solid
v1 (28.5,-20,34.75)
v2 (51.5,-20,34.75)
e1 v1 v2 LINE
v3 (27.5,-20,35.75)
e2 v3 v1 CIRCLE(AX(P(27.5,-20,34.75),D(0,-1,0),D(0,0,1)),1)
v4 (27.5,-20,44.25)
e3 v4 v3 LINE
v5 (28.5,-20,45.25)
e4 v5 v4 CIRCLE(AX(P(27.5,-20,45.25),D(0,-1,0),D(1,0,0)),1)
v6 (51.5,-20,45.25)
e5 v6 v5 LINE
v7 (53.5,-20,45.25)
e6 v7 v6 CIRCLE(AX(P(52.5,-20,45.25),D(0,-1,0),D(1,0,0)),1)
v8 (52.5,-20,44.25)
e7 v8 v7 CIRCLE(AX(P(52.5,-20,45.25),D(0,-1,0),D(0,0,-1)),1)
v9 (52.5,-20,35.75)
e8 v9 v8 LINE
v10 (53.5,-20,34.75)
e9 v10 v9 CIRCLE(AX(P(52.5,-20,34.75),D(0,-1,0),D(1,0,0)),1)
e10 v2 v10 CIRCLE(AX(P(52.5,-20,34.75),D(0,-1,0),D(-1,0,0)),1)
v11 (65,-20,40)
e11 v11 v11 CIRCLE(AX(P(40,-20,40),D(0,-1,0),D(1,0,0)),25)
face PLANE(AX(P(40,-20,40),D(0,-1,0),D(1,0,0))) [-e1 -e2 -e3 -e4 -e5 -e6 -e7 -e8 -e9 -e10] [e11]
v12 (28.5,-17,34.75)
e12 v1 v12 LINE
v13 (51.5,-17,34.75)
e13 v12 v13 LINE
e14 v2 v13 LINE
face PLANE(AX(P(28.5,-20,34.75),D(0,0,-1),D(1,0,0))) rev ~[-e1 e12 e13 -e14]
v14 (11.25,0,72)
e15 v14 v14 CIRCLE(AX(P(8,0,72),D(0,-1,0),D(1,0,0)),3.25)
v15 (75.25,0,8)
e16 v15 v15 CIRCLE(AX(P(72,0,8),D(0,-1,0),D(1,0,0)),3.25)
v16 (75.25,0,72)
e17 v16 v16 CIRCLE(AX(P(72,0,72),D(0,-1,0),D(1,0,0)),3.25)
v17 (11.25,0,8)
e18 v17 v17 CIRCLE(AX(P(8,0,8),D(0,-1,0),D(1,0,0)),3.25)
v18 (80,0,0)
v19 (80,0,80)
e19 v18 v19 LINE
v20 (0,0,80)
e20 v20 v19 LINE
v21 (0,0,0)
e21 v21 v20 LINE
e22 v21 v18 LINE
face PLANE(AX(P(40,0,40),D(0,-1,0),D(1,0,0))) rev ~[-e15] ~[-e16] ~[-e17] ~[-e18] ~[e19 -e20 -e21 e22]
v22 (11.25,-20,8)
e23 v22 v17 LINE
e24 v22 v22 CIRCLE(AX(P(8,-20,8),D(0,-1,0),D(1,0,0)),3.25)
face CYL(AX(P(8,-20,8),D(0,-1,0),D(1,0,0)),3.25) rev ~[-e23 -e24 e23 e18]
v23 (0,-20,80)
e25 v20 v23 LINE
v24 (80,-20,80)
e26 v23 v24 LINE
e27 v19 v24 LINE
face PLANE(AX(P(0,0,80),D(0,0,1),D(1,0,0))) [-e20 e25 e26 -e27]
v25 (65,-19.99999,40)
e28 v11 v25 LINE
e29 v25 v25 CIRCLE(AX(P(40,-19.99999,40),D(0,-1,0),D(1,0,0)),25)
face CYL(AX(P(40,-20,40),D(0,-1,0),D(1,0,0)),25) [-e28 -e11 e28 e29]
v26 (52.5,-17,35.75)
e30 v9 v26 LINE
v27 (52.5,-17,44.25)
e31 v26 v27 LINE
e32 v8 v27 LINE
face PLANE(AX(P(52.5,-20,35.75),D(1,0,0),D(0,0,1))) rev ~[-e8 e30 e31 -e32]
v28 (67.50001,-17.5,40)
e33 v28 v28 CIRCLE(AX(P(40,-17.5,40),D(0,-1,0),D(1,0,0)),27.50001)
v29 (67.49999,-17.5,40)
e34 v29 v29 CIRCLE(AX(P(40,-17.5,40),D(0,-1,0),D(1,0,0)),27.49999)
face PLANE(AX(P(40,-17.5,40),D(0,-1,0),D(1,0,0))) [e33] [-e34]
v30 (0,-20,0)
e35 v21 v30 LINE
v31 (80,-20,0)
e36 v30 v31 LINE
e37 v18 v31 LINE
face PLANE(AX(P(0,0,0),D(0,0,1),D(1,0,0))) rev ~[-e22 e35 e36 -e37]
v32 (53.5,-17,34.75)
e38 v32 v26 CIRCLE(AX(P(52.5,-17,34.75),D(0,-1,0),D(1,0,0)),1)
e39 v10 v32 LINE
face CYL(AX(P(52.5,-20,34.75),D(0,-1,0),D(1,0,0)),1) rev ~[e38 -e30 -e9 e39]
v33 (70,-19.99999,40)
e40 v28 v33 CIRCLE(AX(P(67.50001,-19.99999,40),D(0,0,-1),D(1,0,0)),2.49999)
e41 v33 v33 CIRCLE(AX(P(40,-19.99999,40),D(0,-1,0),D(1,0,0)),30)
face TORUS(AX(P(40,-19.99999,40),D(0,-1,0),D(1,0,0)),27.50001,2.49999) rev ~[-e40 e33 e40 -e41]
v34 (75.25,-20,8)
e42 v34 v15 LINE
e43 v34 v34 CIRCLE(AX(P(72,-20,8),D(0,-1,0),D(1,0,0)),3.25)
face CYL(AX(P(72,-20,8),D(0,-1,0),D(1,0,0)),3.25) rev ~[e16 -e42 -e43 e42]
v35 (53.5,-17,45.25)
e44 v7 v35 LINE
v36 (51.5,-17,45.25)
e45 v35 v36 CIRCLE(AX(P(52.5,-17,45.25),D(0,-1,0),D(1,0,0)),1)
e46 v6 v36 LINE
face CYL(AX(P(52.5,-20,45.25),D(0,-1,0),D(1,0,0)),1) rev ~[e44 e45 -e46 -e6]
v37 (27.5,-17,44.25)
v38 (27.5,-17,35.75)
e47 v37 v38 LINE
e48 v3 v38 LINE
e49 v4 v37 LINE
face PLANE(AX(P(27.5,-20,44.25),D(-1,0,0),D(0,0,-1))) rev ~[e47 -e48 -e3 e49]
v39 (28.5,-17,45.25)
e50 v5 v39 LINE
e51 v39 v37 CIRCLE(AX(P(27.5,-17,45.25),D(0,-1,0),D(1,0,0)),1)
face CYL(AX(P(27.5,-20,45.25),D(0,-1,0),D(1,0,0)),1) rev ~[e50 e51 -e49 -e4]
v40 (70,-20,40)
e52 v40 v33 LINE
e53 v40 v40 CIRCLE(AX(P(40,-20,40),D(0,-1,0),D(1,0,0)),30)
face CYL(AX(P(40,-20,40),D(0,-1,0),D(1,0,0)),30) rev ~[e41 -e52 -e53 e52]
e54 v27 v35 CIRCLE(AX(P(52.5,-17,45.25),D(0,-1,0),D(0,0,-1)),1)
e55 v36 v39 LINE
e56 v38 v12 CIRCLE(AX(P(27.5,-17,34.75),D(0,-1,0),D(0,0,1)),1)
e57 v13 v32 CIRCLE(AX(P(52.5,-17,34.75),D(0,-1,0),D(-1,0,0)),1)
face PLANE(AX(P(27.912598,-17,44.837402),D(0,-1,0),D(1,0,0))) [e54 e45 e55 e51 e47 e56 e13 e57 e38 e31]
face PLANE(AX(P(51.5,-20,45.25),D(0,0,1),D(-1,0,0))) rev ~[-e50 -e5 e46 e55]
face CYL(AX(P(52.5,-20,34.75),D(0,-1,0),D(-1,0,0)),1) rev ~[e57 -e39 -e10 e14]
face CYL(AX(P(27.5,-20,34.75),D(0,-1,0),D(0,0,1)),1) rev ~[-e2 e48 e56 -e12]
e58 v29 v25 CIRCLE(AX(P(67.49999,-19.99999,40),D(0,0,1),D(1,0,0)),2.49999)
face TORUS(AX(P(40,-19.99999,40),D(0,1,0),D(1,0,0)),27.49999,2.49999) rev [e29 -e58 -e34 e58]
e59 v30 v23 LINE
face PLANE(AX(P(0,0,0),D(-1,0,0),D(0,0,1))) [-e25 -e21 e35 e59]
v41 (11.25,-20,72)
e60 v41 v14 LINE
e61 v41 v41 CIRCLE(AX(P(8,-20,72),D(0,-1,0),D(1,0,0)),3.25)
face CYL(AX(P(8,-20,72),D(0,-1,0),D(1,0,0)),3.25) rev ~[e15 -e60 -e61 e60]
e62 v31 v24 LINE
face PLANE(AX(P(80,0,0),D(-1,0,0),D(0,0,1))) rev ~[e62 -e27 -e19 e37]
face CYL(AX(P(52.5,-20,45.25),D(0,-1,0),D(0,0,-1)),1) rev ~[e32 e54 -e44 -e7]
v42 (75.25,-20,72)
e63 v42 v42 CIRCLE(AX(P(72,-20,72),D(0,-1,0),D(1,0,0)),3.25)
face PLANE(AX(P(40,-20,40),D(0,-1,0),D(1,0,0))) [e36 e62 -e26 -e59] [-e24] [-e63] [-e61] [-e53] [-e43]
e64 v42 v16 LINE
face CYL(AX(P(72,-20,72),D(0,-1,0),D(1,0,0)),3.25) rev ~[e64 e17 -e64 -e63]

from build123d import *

# Parameters (mm, degrees)
F1_W     = 80
F1_H     = 80
F2_DEPTH = 20
F4_R     = 3.25
F5_DEPTH = 20.001
F4_R_2   = 30
F4_R_3   = 25
F6_DEPTH = 2.5
F7_DEPTH = 3
F8_R     = 2.49999
F9_R     = 2.49999


# Not quite as in the source:
# - a fillet or chamfer is up to 0.001 mm smaller than in the source, because OpenCascade refuses the exact size


with BuildPart() as f2:
    # F1 (on Front) → F2 (new body)
    with BuildSketch(Plane.XZ):
        with Locations((40, 40)):
            Rectangle(F1_W, F1_H)
    extrude(amount=F2_DEPTH)

    # F4 (on face) → F5 (cut, through all)
    with BuildSketch(Plane.XZ.offset(20)):
        with Locations((72, 8)):
            Circle(F4_R)
        with Locations((8, 8)):
            Circle(F4_R)
        with Locations((8, 72)):
            Circle(F4_R)
        with Locations((72, 72)):
            Circle(F4_R)
    extrude(amount=-F5_DEPTH, mode=Mode.SUBTRACT)

    # F4 (on face) → F6 (cut)
    with BuildSketch(Plane.XZ.offset(20)):
        with Locations((40, 40)):
            Circle(F4_R_2)
        with Locations((40, 40)):
            Circle(F4_R_3, mode=Mode.SUBTRACT)
    extrude(amount=-F6_DEPTH, mode=Mode.SUBTRACT)

    # F4 (on face) → F7 (cut)
    with BuildSketch(Plane.XZ.offset(20)):
        with BuildLine():
            Line((28.5, 45.25), (27.5, 45.25))
            Line((27.5, 45.25), (27.5, 44.25))
            ThreePointArc((27.5, 44.25), (28.2071067812, 44.5428932188), (28.5, 45.25))
        make_face()
        with BuildLine():
            Line((51.5, 45.25), (28.5, 45.25))
            ThreePointArc((28.5, 45.25), (28.2071067812, 44.5428932188), (27.5, 44.25))
            Line((27.5, 44.25), (27.5, 40))
            Line((27.5, 40), (52.5, 40))
            Line((52.5, 40), (52.5, 44.25))
            ThreePointArc((52.5, 44.25), (51.7928932188, 44.5428932188), (51.5, 45.25))
        make_face()
        with BuildLine():
            Line((52.5, 45.25), (51.5, 45.25))
            ThreePointArc((51.5, 45.25), (51.7928932188, 44.5428932188), (52.5, 44.25))
            Line((52.5, 44.25), (52.5, 45.25))
        make_face()
        with BuildLine():
            ThreePointArc((28.5, 34.75), (28.2071067812, 35.4571067812), (27.5, 35.75))
            Line((27.5, 35.75), (27.5, 34.75))
            Line((27.5, 34.75), (28.5, 34.75))
        make_face()
        with BuildLine():
            Line((52.5, 40), (27.5, 40))
            Line((27.5, 40), (27.5, 35.75))
            ThreePointArc((27.5, 35.75), (28.2071067812, 35.4571067812), (28.5, 34.75))
            Line((28.5, 34.75), (51.5, 34.75))
            ThreePointArc((51.5, 34.75), (51.7928932188, 35.4571067812), (52.5, 35.75))
            Line((52.5, 35.75), (52.5, 40))
        make_face()
        with BuildLine():
            Line((52.5, 34.75), (52.5, 35.75))
            ThreePointArc((52.5, 35.75), (51.7928932188, 35.4571067812), (51.5, 34.75))
            Line((51.5, 34.75), (52.5, 34.75))
        make_face()
        with BuildLine():
            Line((27.5, 34.75), (27.5, 35.75))
            ThreePointArc((27.5, 35.75), (26.7928932188, 34.0428932188), (28.5, 34.75))
            Line((28.5, 34.75), (27.5, 34.75))
        make_face()
        with BuildLine():
            ThreePointArc((53.5, 34.75), (53.2071067812, 35.4571067812), (52.5, 35.75))
            Line((52.5, 35.75), (52.5, 34.75))
            Line((52.5, 34.75), (51.5, 34.75))
            ThreePointArc((51.5, 34.75), (52.5, 33.75), (53.5, 34.75))
        make_face()
        with BuildLine():
            ThreePointArc((53.5, 45.25), (52.5, 46.25), (51.5, 45.25))
            Line((51.5, 45.25), (52.5, 45.25))
            Line((52.5, 45.25), (52.5, 44.25))
            ThreePointArc((52.5, 44.25), (53.2071067812, 44.5428932188), (53.5, 45.25))
        make_face()
        with BuildLine():
            Line((27.5, 44.25), (27.5, 45.25))
            Line((27.5, 45.25), (28.5, 45.25))
            ThreePointArc((28.5, 45.25), (26.7928932188, 45.9571067812), (27.5, 44.25))
        make_face()
    extrude(amount=-F7_DEPTH, mode=Mode.SUBTRACT)

    # F8 (radius 2.5 in the source; OpenCascade refuses exactly that, so slightly less here)
    f8_edges = [f2.edges().sort_by_distance(p)[0] for p in [
        (15, -17.5, 40),
    ]]
    fillet(f8_edges, radius=F8_R)

    # F9 (radius 2.5 in the source; OpenCascade refuses exactly that, so slightly less here)
    f9_edges = [f2.edges().sort_by_distance(p)[0] for p in [
        (10, -17.5, 40),
    ]]
    fillet(f9_edges, radius=F9_R)


solid = f2.part
